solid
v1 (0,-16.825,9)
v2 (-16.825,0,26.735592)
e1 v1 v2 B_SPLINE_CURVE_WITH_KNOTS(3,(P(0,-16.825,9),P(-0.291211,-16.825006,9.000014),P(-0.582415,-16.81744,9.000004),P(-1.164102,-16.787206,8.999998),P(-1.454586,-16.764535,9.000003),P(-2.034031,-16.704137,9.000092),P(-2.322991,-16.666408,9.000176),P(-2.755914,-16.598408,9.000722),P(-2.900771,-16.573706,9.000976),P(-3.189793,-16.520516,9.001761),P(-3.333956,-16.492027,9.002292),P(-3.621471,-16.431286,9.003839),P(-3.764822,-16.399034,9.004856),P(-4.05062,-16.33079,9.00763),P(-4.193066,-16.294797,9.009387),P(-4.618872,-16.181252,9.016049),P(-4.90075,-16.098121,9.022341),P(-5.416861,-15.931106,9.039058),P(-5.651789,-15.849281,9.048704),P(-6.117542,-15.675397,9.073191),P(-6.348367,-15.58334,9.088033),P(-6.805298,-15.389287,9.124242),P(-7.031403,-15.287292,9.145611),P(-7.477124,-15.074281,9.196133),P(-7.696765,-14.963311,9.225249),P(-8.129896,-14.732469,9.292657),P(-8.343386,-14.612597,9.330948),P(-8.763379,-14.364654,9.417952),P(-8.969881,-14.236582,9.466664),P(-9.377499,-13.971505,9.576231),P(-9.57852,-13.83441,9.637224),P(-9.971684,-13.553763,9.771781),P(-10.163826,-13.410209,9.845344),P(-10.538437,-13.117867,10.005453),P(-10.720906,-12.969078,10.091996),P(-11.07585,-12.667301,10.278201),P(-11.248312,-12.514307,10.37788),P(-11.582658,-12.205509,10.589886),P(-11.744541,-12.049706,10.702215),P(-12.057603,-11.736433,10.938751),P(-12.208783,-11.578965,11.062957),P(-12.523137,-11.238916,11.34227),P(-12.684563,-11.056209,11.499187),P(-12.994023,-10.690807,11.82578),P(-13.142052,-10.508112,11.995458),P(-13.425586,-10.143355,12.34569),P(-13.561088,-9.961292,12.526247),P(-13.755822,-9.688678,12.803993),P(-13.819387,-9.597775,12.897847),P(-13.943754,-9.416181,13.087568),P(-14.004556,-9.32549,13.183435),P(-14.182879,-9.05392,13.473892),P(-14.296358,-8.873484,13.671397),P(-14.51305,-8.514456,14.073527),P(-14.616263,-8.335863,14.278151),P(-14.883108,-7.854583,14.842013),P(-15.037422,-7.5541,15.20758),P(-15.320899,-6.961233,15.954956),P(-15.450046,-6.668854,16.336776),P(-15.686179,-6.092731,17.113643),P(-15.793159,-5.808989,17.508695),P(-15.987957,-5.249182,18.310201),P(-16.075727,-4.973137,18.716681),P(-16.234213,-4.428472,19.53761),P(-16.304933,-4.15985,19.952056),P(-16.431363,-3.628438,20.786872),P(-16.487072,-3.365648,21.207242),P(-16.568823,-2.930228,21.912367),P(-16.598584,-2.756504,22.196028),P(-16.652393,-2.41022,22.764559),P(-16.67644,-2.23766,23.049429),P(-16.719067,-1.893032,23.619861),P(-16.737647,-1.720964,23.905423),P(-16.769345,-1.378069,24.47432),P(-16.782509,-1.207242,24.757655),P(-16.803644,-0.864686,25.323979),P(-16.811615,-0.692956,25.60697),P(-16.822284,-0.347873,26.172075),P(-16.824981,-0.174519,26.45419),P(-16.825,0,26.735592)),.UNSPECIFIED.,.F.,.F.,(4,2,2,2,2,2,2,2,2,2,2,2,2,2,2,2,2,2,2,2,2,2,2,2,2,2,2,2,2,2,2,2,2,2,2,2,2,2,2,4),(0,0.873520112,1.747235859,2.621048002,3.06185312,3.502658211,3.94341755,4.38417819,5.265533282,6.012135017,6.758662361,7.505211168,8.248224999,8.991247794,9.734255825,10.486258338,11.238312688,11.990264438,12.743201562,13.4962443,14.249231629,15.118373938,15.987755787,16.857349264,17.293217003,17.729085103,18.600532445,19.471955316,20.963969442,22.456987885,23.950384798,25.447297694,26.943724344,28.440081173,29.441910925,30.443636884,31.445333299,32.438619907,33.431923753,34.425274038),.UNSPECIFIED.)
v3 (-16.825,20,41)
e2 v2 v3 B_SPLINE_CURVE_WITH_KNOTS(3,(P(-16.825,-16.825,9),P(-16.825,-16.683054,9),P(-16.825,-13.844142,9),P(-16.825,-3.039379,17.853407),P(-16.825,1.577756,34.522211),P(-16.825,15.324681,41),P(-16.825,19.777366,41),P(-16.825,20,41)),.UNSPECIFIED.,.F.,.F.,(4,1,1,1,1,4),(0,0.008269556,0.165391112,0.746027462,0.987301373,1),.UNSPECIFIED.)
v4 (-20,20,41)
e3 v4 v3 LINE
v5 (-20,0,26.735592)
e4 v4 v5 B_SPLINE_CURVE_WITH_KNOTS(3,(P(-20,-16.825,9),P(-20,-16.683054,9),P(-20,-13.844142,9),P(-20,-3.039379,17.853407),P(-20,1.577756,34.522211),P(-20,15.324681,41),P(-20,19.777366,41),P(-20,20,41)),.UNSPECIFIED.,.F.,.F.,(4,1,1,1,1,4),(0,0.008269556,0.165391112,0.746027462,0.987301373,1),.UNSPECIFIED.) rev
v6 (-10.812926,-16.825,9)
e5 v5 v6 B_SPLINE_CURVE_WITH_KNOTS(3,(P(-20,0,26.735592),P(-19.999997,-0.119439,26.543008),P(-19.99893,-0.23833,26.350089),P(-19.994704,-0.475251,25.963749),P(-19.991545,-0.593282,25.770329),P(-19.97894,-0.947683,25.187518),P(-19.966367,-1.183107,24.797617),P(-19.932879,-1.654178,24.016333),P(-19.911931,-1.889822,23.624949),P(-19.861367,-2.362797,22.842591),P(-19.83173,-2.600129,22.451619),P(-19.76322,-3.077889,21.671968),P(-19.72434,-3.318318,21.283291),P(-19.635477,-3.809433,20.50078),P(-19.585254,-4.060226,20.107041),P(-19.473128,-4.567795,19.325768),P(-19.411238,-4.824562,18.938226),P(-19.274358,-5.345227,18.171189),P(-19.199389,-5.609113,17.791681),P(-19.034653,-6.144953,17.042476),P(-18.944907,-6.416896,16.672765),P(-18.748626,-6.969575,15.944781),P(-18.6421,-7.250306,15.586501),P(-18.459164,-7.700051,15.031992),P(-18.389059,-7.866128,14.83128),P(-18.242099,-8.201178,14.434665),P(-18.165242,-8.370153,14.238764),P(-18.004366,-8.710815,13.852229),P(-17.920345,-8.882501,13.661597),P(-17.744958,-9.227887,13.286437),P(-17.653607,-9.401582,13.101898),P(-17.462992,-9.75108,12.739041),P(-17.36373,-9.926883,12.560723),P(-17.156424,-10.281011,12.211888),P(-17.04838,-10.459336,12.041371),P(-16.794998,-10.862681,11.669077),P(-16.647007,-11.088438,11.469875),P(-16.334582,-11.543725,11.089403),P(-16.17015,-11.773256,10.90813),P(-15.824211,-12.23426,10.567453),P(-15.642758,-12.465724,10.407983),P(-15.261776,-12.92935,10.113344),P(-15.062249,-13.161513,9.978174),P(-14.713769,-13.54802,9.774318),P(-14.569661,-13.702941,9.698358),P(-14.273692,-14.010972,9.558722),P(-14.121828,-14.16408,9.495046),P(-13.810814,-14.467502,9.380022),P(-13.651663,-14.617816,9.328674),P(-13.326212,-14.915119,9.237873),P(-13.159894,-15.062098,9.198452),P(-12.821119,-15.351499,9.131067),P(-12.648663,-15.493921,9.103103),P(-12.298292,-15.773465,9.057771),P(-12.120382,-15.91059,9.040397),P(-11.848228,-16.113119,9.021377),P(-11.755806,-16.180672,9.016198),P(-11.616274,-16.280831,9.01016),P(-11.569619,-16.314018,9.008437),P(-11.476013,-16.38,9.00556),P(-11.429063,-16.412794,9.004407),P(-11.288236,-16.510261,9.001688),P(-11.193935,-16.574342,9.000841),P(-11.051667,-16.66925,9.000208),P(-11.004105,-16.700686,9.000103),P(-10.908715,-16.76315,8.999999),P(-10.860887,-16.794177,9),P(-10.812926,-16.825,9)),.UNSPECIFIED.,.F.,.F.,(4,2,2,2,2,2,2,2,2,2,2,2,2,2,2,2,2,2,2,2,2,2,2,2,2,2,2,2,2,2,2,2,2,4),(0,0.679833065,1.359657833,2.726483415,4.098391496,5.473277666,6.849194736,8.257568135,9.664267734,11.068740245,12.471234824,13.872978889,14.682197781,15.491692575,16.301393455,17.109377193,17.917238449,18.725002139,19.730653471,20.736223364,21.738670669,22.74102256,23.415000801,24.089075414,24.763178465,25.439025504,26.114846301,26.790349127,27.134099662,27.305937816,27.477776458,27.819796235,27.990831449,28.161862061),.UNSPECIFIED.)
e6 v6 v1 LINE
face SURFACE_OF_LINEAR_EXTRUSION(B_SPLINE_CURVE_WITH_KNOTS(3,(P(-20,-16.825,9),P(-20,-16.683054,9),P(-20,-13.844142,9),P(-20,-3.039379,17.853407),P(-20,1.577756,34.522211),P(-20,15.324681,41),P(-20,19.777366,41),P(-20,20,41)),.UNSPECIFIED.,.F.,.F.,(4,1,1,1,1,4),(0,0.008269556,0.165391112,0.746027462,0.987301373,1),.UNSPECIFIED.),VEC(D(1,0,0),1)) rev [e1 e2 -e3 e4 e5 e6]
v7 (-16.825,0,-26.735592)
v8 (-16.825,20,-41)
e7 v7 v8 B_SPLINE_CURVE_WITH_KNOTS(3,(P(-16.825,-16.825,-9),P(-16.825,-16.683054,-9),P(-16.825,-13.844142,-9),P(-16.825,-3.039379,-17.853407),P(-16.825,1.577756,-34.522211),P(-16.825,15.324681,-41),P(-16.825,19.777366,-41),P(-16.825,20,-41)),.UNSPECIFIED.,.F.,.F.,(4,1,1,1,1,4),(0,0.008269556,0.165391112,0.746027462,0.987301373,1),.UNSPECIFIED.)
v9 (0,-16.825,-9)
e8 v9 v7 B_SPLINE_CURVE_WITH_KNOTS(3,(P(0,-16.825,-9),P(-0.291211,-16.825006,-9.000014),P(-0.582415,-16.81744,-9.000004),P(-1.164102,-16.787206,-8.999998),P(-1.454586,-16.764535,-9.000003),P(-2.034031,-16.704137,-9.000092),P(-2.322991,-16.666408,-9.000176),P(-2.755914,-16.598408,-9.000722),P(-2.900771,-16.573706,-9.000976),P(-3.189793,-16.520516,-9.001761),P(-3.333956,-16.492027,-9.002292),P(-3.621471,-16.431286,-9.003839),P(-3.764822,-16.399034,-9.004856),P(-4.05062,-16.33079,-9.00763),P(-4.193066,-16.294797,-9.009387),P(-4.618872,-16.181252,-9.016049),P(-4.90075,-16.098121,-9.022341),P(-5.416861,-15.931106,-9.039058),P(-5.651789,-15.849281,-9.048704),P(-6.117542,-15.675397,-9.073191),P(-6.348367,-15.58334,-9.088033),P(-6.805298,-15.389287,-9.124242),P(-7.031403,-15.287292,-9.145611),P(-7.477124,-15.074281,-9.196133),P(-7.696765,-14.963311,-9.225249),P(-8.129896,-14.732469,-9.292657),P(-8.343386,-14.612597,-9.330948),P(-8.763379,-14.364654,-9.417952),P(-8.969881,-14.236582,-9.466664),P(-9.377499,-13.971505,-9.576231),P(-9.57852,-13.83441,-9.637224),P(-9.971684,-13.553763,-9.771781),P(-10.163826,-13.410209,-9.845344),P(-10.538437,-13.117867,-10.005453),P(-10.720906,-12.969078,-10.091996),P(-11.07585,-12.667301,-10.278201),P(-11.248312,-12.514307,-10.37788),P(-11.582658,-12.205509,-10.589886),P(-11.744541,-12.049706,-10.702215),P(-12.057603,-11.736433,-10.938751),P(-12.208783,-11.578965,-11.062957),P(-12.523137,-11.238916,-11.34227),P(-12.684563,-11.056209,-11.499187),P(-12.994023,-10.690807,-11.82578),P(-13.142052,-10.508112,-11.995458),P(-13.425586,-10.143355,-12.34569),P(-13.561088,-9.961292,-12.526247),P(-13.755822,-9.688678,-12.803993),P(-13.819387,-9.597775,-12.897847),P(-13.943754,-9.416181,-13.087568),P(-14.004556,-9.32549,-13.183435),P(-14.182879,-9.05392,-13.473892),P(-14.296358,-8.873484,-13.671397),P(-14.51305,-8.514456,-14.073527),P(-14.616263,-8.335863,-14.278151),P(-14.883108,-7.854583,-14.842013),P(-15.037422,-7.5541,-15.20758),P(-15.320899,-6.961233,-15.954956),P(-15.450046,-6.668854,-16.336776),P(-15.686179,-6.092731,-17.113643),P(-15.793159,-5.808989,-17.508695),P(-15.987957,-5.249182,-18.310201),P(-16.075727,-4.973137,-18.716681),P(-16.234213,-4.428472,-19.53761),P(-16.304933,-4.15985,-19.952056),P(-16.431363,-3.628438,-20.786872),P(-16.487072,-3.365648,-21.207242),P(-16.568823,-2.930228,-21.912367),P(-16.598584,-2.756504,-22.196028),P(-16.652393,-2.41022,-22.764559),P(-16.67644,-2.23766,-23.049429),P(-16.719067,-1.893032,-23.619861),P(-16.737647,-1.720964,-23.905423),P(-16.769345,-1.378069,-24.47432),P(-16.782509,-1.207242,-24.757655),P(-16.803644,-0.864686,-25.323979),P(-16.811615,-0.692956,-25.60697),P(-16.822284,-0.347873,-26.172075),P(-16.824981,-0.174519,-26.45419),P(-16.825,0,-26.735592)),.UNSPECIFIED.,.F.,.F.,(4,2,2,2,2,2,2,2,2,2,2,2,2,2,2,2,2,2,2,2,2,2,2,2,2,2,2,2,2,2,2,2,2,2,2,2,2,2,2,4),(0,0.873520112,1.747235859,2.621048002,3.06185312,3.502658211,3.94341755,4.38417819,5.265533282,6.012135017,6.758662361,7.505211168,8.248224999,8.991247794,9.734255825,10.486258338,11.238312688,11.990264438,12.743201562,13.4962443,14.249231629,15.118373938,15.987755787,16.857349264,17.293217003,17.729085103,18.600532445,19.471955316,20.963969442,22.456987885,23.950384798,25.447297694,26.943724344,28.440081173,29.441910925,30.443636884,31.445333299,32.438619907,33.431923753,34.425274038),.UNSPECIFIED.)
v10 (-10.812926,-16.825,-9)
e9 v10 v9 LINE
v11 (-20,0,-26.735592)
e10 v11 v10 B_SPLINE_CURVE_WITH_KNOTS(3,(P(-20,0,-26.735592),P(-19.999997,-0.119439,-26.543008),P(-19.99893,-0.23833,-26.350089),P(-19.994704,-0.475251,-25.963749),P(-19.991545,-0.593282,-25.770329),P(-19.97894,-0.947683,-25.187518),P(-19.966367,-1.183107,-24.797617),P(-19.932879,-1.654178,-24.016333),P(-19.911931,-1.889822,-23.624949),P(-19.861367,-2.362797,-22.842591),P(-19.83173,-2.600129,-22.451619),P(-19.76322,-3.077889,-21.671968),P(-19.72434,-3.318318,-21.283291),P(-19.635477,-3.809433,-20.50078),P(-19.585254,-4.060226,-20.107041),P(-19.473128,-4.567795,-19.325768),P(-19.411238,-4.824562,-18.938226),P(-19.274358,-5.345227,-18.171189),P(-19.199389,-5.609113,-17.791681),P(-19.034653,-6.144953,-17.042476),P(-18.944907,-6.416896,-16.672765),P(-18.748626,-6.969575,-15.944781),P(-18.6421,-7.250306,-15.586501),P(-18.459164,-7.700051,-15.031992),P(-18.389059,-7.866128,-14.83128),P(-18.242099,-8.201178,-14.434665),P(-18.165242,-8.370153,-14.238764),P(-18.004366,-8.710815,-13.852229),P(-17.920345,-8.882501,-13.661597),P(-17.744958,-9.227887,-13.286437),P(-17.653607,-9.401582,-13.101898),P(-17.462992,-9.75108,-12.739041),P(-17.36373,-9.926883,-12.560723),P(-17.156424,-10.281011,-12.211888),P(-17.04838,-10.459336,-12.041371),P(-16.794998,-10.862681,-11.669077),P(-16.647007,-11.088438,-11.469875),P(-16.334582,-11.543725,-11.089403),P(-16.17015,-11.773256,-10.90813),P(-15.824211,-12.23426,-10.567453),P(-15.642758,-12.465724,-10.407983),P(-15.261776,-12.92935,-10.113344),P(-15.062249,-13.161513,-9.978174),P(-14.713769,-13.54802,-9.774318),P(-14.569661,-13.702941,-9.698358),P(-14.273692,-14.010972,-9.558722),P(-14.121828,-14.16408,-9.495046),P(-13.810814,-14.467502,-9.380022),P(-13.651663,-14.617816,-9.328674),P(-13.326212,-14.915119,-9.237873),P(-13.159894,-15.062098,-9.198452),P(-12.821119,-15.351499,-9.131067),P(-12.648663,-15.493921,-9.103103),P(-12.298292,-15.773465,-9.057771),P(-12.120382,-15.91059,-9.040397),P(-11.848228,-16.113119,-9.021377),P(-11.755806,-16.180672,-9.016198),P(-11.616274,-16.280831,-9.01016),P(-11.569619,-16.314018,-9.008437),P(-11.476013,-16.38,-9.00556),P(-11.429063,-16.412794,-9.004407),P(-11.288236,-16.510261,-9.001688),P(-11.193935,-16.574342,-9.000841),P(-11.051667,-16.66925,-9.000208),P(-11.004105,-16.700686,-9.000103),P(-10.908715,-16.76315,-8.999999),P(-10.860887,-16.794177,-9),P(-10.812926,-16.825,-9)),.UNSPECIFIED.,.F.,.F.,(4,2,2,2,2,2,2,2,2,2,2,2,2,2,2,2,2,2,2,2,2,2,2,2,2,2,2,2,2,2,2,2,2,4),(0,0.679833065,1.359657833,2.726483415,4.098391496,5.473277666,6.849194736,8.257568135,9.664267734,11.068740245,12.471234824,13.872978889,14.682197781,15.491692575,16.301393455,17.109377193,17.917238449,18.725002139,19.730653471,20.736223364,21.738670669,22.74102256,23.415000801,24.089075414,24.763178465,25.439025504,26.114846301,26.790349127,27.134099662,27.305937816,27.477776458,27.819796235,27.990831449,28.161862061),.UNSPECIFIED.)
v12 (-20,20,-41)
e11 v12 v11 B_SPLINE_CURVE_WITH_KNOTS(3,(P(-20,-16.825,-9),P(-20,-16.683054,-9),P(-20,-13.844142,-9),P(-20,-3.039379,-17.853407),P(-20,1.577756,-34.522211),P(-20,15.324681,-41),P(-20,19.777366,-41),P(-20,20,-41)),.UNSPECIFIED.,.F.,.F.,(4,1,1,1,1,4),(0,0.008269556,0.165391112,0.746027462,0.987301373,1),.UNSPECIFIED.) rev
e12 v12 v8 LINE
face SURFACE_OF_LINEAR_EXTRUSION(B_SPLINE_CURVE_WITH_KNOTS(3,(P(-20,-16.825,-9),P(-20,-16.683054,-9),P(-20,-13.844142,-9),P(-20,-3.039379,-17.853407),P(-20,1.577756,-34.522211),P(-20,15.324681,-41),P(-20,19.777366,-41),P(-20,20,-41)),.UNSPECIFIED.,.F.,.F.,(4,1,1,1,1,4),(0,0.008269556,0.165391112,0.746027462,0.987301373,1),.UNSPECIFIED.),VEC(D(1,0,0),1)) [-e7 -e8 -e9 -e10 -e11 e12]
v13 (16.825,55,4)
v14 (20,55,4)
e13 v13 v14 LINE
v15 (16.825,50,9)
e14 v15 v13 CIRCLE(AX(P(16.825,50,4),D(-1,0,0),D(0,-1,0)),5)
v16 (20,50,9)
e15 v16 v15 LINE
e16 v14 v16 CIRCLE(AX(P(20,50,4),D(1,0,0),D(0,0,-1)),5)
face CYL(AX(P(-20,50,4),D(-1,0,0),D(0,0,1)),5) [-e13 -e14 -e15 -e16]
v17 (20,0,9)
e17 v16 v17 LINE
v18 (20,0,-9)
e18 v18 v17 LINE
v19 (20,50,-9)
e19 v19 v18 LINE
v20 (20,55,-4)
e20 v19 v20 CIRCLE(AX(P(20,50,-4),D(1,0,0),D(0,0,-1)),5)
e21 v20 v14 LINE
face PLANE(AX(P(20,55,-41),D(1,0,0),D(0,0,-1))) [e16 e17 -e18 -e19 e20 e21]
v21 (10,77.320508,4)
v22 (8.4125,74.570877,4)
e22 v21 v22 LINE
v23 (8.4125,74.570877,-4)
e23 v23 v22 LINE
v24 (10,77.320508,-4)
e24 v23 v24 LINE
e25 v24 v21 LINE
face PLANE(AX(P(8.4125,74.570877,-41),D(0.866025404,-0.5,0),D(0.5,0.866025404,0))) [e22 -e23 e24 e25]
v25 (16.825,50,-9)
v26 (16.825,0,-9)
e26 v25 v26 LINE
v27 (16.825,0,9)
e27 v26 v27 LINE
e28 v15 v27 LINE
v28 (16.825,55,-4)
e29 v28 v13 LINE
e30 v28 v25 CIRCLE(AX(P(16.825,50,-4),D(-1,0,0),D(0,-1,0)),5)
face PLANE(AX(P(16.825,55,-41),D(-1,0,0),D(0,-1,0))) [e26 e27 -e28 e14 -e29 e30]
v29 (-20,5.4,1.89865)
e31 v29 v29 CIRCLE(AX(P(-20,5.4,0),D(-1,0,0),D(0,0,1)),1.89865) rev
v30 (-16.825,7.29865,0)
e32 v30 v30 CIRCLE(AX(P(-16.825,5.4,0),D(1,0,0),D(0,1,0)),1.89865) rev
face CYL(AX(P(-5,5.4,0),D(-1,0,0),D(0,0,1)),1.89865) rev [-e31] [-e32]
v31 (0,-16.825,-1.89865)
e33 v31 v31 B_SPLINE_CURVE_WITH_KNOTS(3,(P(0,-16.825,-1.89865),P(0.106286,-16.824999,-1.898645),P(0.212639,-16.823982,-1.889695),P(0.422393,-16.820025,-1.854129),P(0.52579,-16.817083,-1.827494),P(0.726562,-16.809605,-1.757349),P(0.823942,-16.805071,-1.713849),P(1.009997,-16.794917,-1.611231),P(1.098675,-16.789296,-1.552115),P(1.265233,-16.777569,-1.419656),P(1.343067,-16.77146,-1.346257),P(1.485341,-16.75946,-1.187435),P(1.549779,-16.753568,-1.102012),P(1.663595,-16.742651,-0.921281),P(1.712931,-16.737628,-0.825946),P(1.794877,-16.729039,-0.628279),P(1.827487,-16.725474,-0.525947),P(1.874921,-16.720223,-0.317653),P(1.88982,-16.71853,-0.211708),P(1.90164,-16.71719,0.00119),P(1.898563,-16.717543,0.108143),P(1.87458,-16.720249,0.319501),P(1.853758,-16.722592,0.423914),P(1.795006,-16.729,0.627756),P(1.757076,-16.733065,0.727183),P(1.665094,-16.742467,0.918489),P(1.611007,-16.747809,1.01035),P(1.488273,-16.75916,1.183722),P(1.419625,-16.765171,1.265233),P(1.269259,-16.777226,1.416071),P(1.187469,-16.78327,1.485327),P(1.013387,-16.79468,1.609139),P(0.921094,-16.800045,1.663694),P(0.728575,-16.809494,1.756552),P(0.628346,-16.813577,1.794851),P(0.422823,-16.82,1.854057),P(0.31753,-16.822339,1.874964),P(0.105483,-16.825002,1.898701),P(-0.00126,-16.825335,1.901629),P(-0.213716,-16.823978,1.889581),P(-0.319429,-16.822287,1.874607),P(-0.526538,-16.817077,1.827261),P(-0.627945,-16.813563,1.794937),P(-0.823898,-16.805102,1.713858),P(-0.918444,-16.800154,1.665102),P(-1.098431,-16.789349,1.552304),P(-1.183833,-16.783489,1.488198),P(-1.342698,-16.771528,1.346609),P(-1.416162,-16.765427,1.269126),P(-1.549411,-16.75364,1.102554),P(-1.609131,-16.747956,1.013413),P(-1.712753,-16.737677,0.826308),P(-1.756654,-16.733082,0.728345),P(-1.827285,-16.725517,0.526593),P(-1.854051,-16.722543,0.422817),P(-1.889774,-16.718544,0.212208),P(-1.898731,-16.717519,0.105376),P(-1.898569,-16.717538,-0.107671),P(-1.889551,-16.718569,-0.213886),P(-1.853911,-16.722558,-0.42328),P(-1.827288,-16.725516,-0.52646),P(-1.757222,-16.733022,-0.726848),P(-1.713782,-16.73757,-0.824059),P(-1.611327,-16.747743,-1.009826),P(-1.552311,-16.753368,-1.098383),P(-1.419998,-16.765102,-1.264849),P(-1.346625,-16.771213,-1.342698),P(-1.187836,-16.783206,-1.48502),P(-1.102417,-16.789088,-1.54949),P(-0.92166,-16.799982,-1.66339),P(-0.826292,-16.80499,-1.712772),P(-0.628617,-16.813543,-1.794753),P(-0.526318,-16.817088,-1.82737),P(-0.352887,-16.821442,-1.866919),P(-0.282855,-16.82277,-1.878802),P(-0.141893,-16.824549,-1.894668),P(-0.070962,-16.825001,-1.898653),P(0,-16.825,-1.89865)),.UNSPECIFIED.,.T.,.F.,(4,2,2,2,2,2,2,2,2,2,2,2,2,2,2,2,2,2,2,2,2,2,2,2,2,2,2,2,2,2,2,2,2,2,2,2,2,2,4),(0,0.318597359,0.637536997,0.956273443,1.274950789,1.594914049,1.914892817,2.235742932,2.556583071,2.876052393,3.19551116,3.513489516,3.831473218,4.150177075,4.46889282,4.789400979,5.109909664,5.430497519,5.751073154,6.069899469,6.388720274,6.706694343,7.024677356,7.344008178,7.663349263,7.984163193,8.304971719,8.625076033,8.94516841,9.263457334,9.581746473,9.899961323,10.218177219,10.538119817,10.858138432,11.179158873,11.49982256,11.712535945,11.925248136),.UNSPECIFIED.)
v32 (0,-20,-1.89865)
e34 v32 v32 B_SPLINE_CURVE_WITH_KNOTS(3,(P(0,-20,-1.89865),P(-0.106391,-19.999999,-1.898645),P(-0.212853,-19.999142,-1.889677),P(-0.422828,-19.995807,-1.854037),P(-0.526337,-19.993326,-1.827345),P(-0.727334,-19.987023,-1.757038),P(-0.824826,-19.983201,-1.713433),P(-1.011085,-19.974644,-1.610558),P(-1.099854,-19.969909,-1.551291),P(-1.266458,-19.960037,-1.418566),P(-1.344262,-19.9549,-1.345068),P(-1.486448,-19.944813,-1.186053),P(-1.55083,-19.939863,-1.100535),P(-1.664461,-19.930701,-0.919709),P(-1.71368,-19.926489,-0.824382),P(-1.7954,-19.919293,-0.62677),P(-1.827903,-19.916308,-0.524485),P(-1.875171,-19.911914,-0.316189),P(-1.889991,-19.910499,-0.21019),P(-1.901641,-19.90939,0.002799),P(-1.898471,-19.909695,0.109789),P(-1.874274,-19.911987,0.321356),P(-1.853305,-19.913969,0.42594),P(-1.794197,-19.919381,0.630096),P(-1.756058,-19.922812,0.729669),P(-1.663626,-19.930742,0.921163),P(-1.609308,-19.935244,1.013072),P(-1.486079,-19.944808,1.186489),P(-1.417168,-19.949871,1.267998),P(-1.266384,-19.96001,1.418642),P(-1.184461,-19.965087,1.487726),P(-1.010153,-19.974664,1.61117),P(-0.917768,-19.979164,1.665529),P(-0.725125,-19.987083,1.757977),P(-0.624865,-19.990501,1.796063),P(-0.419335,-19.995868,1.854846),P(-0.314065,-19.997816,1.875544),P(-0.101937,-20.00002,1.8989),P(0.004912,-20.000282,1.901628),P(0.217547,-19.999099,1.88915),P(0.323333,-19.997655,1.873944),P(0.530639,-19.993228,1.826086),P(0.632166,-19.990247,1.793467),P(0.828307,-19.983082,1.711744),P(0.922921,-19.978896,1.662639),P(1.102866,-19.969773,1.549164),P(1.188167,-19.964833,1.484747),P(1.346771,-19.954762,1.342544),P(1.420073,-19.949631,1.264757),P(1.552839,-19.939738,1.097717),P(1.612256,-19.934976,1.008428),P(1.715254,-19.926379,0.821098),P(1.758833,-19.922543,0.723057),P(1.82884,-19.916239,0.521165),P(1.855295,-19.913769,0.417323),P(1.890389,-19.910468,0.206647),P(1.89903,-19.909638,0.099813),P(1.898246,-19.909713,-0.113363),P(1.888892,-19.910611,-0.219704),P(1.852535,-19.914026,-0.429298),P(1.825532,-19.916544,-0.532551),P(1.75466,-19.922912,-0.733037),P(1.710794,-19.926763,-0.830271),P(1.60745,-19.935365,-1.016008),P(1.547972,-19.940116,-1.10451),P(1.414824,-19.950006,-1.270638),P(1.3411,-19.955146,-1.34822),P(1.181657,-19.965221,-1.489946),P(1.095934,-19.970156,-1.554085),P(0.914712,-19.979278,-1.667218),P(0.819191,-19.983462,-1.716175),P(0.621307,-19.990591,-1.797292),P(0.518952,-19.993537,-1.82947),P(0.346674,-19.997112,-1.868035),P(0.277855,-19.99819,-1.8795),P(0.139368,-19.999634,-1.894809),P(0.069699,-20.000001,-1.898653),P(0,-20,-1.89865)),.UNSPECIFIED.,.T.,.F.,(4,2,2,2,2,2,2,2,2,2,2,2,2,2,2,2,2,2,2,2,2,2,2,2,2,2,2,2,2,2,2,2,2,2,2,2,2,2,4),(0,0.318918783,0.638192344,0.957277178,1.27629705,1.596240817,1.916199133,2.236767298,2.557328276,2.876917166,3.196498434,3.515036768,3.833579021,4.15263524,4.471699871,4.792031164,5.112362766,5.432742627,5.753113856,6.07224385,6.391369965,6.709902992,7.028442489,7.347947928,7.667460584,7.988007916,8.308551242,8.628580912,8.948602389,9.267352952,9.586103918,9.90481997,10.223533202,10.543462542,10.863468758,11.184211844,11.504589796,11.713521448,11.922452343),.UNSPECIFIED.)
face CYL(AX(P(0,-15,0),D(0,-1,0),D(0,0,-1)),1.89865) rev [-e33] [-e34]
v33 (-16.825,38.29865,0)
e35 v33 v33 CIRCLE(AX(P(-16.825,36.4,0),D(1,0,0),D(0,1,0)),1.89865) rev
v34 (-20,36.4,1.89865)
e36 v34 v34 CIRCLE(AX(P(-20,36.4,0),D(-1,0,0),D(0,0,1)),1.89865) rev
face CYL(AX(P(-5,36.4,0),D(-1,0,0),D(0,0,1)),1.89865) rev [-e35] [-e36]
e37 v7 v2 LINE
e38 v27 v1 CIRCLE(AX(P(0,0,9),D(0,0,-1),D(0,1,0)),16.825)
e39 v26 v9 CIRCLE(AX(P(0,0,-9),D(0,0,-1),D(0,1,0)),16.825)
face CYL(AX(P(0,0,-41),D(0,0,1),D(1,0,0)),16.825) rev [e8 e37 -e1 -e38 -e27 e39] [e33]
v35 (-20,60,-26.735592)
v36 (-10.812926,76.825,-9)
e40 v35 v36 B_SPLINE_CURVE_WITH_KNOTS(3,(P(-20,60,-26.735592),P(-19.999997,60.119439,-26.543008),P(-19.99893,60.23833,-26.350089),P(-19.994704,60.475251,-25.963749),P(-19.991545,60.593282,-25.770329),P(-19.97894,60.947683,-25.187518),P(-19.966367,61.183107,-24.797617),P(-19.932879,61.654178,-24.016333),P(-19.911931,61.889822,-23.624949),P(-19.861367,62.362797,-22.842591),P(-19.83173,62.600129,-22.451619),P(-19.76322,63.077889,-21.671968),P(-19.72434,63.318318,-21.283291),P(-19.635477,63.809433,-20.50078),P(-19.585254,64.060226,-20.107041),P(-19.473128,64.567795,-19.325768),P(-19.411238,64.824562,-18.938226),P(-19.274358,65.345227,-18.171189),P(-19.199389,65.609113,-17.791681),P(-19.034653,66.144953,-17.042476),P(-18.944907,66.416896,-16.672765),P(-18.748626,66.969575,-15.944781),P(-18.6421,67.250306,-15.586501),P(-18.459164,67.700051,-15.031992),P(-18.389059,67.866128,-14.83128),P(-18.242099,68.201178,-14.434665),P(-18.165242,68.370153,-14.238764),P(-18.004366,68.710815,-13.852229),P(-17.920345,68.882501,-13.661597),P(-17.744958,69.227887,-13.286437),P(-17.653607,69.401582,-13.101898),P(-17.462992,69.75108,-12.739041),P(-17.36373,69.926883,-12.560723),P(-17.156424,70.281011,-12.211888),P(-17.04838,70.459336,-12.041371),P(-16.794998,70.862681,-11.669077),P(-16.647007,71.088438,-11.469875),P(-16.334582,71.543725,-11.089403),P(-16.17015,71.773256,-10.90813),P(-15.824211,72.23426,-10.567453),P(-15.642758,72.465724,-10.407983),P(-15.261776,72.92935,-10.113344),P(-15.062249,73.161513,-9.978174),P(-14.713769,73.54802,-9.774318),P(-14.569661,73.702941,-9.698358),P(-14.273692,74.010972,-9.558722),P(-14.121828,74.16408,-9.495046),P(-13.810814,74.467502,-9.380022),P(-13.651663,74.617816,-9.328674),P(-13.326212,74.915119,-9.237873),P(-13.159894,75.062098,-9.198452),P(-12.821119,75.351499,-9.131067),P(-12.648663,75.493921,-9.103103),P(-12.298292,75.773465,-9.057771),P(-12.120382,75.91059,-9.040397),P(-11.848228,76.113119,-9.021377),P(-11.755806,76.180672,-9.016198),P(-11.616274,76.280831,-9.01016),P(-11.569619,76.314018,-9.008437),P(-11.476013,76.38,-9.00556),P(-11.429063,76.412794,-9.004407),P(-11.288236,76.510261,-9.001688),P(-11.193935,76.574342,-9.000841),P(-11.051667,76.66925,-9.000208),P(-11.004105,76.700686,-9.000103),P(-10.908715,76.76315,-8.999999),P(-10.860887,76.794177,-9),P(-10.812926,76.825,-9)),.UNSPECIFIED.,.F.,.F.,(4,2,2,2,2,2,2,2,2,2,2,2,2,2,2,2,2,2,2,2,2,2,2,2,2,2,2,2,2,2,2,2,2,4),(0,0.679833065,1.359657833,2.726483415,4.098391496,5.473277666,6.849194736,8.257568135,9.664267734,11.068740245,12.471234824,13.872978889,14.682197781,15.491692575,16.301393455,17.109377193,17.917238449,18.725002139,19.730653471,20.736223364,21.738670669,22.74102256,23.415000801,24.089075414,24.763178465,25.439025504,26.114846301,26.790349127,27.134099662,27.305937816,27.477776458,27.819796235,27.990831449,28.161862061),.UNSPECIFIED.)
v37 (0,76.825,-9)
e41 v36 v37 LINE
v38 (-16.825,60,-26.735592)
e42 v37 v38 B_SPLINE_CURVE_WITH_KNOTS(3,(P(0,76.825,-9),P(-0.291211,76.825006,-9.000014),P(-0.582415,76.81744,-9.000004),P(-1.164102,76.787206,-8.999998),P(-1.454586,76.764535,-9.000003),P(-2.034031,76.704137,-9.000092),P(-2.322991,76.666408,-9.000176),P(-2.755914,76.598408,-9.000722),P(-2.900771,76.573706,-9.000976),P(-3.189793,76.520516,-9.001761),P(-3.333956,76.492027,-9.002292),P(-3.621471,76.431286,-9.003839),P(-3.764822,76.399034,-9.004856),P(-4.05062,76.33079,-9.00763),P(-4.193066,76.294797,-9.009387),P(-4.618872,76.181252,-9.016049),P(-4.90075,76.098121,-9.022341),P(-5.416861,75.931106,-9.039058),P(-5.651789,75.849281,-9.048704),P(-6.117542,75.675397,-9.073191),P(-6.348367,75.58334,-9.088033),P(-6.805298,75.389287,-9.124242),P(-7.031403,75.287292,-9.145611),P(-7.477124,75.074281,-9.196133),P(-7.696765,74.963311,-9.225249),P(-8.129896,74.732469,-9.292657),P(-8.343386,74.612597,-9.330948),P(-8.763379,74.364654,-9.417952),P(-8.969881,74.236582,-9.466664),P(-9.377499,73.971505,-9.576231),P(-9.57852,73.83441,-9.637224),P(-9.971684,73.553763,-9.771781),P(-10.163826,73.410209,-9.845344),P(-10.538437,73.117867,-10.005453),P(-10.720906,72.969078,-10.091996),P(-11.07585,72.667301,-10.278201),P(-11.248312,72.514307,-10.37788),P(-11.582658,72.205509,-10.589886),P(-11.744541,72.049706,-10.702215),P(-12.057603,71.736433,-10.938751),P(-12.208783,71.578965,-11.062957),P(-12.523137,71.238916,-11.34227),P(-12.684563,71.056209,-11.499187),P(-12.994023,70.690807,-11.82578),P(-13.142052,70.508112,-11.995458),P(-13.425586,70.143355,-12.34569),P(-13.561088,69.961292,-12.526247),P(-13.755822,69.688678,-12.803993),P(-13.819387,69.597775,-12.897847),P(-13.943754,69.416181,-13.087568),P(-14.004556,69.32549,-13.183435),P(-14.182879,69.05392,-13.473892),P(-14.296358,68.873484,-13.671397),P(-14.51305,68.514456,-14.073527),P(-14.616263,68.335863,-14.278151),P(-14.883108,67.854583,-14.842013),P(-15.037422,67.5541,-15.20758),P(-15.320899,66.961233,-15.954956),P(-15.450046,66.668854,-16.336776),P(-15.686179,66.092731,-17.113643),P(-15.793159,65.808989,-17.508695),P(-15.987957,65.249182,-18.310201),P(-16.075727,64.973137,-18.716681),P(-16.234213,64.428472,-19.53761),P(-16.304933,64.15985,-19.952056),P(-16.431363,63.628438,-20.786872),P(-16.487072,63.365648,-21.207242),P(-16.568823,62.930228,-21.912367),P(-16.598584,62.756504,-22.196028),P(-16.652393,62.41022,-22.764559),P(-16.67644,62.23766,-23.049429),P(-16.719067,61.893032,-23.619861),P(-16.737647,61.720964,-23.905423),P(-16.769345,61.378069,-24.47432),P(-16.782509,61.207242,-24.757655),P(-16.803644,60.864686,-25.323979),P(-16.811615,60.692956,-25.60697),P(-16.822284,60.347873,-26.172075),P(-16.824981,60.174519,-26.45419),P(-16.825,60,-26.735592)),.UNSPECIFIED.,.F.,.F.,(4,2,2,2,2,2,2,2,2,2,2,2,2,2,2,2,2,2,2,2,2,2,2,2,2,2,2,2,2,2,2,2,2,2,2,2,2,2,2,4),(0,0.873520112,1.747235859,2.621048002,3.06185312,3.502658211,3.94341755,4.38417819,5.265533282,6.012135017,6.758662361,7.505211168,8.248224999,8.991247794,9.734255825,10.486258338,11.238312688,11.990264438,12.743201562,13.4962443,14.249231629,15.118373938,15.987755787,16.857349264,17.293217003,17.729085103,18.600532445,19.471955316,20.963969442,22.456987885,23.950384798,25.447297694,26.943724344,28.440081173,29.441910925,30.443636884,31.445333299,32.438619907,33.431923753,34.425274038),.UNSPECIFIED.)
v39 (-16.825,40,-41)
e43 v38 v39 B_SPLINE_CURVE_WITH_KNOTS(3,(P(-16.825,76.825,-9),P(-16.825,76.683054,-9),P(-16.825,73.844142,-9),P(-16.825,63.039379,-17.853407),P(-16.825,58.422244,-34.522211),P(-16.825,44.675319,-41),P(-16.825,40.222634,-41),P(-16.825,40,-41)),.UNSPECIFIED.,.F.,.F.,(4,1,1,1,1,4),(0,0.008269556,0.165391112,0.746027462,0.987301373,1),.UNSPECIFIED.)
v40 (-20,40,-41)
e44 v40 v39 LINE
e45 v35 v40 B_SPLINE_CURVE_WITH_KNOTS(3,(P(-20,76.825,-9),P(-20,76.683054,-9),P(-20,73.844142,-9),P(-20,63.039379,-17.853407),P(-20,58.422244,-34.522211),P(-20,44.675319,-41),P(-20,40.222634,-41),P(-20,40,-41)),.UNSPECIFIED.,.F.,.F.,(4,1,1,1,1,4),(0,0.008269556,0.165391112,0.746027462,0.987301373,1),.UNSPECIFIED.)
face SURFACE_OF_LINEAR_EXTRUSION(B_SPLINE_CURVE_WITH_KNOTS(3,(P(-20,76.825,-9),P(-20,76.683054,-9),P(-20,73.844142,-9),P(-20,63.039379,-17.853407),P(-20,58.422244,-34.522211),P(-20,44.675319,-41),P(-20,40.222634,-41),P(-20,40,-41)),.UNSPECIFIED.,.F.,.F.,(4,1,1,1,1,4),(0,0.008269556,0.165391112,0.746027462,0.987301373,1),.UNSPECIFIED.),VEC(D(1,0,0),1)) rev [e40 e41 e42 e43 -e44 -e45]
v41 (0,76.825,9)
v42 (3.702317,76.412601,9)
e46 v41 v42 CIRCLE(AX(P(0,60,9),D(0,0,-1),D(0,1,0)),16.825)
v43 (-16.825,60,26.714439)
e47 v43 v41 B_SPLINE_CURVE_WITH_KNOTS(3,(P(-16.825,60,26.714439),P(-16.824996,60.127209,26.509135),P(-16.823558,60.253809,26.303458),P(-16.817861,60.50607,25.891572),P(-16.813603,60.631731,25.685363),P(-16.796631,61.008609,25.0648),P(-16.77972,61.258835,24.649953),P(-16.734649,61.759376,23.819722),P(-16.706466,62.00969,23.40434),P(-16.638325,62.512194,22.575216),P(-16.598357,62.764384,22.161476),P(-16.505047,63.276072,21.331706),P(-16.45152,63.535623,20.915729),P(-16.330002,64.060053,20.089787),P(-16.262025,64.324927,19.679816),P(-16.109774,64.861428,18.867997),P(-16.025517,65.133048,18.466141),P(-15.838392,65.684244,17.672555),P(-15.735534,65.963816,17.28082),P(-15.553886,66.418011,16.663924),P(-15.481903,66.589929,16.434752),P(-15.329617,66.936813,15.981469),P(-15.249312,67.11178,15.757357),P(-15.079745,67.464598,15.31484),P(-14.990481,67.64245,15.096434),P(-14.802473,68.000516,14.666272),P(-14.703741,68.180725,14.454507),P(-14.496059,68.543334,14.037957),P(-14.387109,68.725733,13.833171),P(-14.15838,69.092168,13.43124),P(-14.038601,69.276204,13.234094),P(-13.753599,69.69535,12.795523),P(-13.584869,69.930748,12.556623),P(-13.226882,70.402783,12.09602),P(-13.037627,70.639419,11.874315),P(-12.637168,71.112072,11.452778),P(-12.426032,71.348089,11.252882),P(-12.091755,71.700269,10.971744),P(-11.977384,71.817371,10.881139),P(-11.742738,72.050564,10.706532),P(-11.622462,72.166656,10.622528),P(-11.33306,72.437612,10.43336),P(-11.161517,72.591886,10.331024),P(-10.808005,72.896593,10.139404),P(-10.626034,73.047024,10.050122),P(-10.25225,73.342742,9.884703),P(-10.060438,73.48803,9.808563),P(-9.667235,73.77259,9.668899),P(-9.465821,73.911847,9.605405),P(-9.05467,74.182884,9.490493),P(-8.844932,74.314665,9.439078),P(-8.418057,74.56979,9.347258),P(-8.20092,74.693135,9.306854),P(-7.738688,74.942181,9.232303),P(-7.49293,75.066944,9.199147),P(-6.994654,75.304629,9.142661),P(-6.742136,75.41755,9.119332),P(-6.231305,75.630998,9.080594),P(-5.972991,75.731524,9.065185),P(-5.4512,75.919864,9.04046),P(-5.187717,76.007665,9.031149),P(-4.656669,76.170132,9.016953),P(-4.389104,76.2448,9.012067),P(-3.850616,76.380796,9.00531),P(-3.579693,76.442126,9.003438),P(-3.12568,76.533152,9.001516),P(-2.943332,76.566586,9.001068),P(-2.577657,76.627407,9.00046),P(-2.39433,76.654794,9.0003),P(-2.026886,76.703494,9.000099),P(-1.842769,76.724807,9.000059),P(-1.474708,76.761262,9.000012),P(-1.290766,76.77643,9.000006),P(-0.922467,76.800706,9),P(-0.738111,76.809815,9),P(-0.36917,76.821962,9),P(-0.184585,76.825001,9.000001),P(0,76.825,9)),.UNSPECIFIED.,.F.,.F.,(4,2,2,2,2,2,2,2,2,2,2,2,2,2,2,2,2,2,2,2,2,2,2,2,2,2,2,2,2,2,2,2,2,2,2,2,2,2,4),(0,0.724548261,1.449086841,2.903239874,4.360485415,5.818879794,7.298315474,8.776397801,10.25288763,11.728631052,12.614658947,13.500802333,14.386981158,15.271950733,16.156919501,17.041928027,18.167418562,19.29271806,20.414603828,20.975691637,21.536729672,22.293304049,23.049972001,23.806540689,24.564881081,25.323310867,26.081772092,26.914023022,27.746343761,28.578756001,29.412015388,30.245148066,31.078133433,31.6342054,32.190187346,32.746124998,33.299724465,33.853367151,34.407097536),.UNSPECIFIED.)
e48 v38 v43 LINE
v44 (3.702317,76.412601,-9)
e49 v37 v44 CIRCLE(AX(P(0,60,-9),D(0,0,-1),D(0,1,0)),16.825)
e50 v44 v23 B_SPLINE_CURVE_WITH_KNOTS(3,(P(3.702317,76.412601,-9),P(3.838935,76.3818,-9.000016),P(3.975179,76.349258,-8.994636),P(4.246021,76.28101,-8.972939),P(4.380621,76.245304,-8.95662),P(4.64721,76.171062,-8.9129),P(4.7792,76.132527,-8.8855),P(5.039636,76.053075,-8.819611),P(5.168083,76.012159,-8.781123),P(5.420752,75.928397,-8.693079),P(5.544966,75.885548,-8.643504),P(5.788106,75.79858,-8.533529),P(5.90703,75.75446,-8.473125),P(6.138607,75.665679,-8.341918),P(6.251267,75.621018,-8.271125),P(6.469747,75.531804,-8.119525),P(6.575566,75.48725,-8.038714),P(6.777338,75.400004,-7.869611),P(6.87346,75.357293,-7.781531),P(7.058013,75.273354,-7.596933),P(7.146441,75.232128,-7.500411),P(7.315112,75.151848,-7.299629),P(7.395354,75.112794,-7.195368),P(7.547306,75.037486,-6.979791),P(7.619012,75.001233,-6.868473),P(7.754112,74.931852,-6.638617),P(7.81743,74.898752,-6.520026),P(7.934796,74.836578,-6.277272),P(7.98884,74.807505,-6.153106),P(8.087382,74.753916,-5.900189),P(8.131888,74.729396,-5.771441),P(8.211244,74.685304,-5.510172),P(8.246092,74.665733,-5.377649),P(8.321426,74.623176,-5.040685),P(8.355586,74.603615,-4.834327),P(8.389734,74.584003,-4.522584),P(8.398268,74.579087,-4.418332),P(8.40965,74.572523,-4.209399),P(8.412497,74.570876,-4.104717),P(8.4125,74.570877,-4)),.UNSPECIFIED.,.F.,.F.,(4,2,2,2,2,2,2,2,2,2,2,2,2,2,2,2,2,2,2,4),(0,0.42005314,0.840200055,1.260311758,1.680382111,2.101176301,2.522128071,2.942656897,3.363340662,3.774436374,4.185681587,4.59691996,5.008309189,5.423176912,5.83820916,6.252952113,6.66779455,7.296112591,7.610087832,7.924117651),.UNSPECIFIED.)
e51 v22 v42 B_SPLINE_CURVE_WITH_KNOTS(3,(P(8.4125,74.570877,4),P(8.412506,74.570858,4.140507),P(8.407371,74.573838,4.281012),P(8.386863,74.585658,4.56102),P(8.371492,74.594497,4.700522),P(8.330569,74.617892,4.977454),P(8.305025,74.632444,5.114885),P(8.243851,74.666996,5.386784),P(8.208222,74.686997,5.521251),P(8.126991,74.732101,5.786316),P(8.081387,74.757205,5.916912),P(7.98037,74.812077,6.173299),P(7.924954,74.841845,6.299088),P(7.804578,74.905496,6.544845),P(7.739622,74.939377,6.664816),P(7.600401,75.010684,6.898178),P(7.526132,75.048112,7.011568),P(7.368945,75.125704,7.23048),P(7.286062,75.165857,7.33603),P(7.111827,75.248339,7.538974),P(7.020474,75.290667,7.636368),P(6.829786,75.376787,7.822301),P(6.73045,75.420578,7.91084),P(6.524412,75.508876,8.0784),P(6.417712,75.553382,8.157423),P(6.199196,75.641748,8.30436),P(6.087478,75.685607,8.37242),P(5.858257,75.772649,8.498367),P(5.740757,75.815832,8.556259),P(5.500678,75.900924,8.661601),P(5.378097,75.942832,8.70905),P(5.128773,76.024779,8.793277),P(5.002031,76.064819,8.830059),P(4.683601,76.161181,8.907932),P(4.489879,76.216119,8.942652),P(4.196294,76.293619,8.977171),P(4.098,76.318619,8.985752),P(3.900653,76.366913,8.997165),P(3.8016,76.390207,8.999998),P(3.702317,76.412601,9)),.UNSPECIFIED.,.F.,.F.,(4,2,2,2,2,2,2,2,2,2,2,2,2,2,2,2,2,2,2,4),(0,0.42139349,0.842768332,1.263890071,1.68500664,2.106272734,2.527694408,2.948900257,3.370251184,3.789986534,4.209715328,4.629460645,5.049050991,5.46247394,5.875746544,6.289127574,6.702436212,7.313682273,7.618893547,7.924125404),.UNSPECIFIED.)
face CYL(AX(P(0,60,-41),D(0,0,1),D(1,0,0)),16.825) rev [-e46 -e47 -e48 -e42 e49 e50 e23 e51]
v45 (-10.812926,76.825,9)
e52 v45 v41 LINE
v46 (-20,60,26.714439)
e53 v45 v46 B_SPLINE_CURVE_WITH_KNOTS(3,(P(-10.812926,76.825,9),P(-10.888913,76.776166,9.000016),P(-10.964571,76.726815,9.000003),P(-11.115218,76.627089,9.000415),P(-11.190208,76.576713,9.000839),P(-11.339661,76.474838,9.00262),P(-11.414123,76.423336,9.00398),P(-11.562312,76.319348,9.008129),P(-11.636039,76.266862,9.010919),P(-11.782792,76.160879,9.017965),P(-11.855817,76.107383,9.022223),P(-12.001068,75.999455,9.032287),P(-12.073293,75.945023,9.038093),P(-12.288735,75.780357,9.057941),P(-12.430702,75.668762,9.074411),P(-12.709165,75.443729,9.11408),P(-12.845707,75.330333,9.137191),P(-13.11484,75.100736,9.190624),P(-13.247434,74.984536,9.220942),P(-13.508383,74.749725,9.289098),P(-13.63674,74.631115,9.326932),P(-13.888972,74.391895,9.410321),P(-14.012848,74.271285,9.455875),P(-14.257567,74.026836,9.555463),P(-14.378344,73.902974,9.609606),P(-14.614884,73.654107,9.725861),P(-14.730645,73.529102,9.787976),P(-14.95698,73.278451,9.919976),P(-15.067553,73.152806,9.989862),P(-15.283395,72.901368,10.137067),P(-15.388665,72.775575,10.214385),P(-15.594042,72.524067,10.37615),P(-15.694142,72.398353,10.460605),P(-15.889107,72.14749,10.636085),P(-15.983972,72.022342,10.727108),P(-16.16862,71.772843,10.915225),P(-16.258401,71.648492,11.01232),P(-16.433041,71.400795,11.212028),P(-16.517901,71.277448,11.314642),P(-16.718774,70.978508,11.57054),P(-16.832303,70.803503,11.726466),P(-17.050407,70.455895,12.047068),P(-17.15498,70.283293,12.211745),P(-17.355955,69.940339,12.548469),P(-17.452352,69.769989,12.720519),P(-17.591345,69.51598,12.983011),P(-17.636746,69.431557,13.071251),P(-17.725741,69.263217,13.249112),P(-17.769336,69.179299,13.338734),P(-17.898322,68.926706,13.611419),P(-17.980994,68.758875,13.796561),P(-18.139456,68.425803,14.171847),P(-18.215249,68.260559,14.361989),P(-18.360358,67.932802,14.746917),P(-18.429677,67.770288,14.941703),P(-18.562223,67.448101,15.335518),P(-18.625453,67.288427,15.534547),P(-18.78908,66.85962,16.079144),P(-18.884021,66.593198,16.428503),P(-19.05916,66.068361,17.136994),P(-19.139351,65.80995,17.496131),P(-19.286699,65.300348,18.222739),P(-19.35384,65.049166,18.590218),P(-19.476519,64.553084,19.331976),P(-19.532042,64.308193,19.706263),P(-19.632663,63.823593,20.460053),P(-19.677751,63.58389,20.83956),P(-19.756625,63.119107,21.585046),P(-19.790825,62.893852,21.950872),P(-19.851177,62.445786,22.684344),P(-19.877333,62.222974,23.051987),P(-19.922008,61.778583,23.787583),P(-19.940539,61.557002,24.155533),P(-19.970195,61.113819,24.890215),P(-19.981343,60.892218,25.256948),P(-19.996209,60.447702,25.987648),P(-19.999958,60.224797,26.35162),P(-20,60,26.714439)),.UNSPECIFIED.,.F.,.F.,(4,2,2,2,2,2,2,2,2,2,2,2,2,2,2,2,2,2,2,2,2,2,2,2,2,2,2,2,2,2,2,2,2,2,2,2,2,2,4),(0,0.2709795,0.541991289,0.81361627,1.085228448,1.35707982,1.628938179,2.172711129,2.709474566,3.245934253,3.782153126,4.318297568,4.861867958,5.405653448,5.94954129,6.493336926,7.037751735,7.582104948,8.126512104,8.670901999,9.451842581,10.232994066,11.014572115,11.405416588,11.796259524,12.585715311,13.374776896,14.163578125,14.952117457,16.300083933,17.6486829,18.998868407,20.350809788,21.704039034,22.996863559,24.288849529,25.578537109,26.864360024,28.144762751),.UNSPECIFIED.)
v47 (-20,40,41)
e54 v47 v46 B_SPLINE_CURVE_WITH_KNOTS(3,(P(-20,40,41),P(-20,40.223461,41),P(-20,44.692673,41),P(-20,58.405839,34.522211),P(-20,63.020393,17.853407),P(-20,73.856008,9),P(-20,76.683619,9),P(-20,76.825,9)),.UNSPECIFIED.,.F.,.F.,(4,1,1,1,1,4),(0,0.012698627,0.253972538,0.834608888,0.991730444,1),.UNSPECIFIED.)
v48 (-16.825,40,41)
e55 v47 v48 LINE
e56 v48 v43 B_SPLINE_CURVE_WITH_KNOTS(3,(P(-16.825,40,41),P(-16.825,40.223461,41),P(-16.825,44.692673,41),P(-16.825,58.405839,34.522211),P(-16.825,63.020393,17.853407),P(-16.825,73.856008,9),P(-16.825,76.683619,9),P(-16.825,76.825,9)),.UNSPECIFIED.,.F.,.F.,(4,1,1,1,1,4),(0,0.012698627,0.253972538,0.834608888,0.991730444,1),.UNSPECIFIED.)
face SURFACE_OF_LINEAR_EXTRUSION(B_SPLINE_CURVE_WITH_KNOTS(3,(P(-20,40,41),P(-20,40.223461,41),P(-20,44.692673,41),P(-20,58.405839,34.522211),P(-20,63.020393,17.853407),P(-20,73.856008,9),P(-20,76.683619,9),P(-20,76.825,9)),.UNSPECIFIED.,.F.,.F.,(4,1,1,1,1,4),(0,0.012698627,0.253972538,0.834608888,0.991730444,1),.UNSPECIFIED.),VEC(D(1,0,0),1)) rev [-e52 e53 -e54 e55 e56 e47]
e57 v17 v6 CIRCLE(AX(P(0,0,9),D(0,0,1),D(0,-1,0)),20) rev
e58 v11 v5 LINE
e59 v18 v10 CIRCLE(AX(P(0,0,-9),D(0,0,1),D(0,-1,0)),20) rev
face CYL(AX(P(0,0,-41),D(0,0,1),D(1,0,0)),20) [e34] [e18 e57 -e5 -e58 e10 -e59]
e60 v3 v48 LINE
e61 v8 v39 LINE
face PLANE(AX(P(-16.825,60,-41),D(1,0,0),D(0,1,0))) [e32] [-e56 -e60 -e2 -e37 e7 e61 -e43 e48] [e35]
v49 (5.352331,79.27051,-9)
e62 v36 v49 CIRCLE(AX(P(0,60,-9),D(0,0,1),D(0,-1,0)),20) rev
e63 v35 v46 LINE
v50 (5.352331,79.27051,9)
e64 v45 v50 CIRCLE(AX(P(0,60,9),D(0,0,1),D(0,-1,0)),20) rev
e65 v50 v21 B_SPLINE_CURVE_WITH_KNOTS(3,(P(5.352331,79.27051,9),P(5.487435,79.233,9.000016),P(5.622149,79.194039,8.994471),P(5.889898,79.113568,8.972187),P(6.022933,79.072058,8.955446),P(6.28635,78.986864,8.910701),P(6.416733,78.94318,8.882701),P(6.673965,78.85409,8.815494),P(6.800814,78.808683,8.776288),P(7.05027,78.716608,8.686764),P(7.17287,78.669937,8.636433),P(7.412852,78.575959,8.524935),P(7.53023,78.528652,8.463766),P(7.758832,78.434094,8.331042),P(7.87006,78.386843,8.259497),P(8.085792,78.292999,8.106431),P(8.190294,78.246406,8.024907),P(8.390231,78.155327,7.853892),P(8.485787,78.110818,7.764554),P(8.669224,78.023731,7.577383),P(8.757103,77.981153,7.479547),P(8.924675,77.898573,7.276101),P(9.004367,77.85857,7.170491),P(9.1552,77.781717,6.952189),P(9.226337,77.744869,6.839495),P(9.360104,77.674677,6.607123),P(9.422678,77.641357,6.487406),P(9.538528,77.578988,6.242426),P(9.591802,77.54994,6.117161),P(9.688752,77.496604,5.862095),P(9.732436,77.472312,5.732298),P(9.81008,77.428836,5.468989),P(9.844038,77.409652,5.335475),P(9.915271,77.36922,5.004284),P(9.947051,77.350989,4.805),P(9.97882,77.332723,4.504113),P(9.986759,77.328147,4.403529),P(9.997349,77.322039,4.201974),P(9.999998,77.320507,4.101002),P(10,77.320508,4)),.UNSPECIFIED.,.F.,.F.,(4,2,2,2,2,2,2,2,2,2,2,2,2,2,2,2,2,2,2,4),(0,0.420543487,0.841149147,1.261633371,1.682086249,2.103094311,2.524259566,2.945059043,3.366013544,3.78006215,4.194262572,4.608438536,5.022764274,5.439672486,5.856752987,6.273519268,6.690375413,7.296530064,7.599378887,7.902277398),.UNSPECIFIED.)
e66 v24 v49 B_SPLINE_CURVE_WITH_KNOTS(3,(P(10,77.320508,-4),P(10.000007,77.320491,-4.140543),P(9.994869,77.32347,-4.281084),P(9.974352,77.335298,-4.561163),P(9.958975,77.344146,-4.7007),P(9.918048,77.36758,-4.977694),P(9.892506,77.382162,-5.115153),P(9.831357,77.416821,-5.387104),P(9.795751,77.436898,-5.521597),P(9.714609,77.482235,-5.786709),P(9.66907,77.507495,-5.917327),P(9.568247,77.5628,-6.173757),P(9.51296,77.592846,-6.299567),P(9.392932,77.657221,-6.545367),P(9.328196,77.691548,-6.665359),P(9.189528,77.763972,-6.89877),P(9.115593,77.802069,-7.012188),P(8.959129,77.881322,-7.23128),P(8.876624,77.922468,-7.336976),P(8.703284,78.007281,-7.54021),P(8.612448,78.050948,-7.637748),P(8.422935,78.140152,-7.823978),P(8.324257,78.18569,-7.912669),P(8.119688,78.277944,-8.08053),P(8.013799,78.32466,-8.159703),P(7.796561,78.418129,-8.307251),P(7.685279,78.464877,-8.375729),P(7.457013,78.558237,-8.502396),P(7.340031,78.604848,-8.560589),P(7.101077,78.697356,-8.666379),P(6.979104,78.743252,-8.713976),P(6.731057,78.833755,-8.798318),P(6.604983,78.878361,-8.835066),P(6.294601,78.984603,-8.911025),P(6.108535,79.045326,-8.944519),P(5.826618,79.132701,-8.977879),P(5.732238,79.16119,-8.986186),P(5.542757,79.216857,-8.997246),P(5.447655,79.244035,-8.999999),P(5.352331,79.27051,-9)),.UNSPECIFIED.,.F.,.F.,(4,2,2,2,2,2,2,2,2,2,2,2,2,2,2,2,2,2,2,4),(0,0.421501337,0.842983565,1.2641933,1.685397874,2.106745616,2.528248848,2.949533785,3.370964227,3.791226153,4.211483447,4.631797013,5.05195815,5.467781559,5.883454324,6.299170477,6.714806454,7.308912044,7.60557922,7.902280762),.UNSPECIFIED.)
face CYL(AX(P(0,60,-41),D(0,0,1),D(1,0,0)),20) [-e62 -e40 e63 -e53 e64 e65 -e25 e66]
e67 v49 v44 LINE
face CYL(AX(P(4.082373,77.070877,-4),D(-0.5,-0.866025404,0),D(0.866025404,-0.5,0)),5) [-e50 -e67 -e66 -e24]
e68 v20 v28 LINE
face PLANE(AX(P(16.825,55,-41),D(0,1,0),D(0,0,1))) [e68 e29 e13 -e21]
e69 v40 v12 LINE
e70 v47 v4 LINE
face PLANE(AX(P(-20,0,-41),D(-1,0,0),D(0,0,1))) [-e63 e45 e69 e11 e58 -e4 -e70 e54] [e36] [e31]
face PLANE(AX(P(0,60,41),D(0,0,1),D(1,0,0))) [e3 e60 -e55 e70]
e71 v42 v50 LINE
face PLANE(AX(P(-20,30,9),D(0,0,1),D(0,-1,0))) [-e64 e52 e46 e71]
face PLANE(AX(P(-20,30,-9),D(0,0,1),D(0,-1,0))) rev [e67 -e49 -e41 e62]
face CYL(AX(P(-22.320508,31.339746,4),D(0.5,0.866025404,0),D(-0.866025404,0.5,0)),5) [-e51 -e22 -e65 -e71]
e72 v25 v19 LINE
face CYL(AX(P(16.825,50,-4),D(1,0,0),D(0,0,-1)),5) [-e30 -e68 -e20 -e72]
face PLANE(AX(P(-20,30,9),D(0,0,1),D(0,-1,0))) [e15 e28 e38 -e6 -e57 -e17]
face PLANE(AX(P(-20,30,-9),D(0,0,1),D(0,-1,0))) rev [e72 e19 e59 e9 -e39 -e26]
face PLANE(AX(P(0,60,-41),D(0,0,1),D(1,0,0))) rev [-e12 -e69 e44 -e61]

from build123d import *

# Parameters (mm, degrees)
HAND_BAND_BODY_DEPTH      = 41
HAND_BAND_BODY_DEPTH_BACK = 41
BACK_HAND_BRACE_DEPTH     = 93.092344959
PALM_BAND_OUTLINE_W       = 32
PALM_BAND_OUTLINE_H       = 100
PALM_BAND_DEPTH           = 20
SKETCH3_R                 = 1.89865
F_6_BOTTOM_HOLE_DEPTH     = 10
SKETCH4_R                 = 1.89865
F_6_SIDE_HOLES_DEPTH      = 20
FILLET1_R                 = 5


# Read off the part's stored shape, not the designer's step: Palm Band
with BuildPart() as part:
    # Sketch1 → Hand Band Body (new, two sides: drawn at the far end of the back side and taken through both)
    with BuildSketch(Plane.XY.offset(-HAND_BAND_BODY_DEPTH_BACK)):
        with BuildLine():
            Line((-20, 0), (-20, 60))
            ThreePointArc((-20, 60), (-10, 77.320508076), (10, 77.320508076))
            Line((10, 77.320508076), (8.4125, 74.570877419))
            ThreePointArc((8.4125, 74.570877419), (-8.4125, 74.570877419), (-16.825, 60))
            Line((-16.825, 60), (-16.825, 0))
            ThreePointArc((-16.825, 0), (0, -16.825), (16.825, 0))
            Line((16.825, 0), (16.825, 55))
            Line((16.825, 55), (20, 55))
            Line((20, 55), (20, 0))
            ThreePointArc((20, 0), (0, -20), (-20, 0))
        make_face()
    extrude(amount=HAND_BAND_BODY_DEPTH + HAND_BAND_BODY_DEPTH_BACK)

    # Sketch2 → Back-Hand Brace (cut, through all)
    with BuildSketch(Plane(origin=(0, 0, 0), x_dir=(0, 0, -1), z_dir=(1, 0, 0))):
        with BuildLine():
            Line((41, 80), (9, 80))
            Line((9, 80), (9, 76.825))
            add(Edge.make_bspline(
                [(9, 76.825), (9, 76.683054398), (9, 73.844142348), (17.85340715, 63.039379279), (34.522211451, 58.42224391), (41, 44.67531916), (41, 40.222634246), (41, 40)],
                knots=[0, 0, 0, 0, 0.008269556, 0.165391112, 0.746027462, 0.987301373, 1, 1, 1, 1], degree=3))
            Line((41, 40), (41, 80))
        make_face()
        with BuildLine():
            Line((41, -20), (41, 20))
            add(Edge.make_bspline(
                [(9, -16.825), (9, -16.683054398), (9, -13.844142348), (17.85340715, -3.039379279), (34.522211451, 1.57775609), (41, 15.32468084), (41, 19.777365754), (41, 20)],
                knots=[0, 0, 0, 0, 0.008269556, 0.165391112, 0.746027462, 0.987301373, 1, 1, 1, 1], degree=3))
            Line((9, -16.825), (9, -20))
            Line((9, -20), (41, -20))
        make_face()
        with BuildLine():
            Line((-41, 80), (-41, 40))
            add(Edge.make_bspline(
                [(-41, 40), (-41, 40.223460634), (-41, 44.692673321), (-34.522211451, 58.40583885), (-17.85340715, 63.020392952), (-9, 73.856007673), (-9, 76.683619413), (-9, 76.825)],
                knots=[0, 0, 0, 0, 0.012698627, 0.253972538, 0.834608888, 0.991730444, 1, 1, 1, 1], degree=3))
            Line((-9, 76.825), (-9, 80))
            Line((-9, 80), (-41, 80))
        make_face()
        with BuildLine():
            add(Edge.make_bspline(
                [(-9, -16.825), (-9, -16.683054398), (-9, -13.844142348), (-17.85340715, -3.039379279), (-34.522211451, 1.57775609), (-41, 15.32468084), (-41, 19.777365754), (-41, 20)],
                knots=[0, 0, 0, 0, 0.008269556, 0.165391112, 0.746027462, 0.987301373, 1, 1, 1, 1], degree=3))
            Line((-41, 20), (-41, -20))
            Line((-41, -20), (-9, -20))
            Line((-9, -20), (-9, -16.825))
        make_face()
    extrude(amount=-BACK_HAND_BRACE_DEPTH, mode=Mode.SUBTRACT)

    # Palm Band outline → Palm Band (cut)
    with BuildSketch(Plane(origin=(0, 0, 0), x_dir=(0, 0, -1), z_dir=(1, 0, 0))):
        with Locations((-25, 30)):
            Rectangle(PALM_BAND_OUTLINE_W, PALM_BAND_OUTLINE_H)
        with Locations((25, 30)):
            Rectangle(PALM_BAND_OUTLINE_W, PALM_BAND_OUTLINE_H)
    extrude(amount=PALM_BAND_DEPTH, mode=Mode.SUBTRACT)

    # Sketch3 → #6 Bottom Hole (cut)
    with BuildSketch(Plane(origin=(0, -25, 0), x_dir=(-1, 0, 0), z_dir=(0, 1, 0))):
        with Locations(Location((0, 0, 0), (0, 0, 270))):
            Circle(SKETCH3_R)
    extrude(amount=F_6_BOTTOM_HOLE_DEPTH, mode=Mode.SUBTRACT)

    # Sketch4 → #6 Side Holes (cut)
    with BuildSketch(Plane(origin=(-25, 0, 0), x_dir=(0, 0, -1), z_dir=(1, 0, 0))):
        with Locations(Location((0, 36.4, 0), (0, 0, 180))):
            Circle(SKETCH4_R)
        with Locations(Location((0, 5.4, 0), (0, 0, 180))):
            Circle(SKETCH4_R)
    extrude(amount=F_6_SIDE_HOLES_DEPTH, mode=Mode.SUBTRACT)

    # Fillet1
    fillet1_edges = [part.edges().sort_by_distance(p)[0] for p in [
        (18.4125, 55, -9),
        (9.20625, 75.945692747, -9),
        (9.20625, 75.945692747, 9),
        (18.4125, 55, 9),
    ]]
    fillet(fillet1_edges, radius=FILLET1_R)


solid = part.part
